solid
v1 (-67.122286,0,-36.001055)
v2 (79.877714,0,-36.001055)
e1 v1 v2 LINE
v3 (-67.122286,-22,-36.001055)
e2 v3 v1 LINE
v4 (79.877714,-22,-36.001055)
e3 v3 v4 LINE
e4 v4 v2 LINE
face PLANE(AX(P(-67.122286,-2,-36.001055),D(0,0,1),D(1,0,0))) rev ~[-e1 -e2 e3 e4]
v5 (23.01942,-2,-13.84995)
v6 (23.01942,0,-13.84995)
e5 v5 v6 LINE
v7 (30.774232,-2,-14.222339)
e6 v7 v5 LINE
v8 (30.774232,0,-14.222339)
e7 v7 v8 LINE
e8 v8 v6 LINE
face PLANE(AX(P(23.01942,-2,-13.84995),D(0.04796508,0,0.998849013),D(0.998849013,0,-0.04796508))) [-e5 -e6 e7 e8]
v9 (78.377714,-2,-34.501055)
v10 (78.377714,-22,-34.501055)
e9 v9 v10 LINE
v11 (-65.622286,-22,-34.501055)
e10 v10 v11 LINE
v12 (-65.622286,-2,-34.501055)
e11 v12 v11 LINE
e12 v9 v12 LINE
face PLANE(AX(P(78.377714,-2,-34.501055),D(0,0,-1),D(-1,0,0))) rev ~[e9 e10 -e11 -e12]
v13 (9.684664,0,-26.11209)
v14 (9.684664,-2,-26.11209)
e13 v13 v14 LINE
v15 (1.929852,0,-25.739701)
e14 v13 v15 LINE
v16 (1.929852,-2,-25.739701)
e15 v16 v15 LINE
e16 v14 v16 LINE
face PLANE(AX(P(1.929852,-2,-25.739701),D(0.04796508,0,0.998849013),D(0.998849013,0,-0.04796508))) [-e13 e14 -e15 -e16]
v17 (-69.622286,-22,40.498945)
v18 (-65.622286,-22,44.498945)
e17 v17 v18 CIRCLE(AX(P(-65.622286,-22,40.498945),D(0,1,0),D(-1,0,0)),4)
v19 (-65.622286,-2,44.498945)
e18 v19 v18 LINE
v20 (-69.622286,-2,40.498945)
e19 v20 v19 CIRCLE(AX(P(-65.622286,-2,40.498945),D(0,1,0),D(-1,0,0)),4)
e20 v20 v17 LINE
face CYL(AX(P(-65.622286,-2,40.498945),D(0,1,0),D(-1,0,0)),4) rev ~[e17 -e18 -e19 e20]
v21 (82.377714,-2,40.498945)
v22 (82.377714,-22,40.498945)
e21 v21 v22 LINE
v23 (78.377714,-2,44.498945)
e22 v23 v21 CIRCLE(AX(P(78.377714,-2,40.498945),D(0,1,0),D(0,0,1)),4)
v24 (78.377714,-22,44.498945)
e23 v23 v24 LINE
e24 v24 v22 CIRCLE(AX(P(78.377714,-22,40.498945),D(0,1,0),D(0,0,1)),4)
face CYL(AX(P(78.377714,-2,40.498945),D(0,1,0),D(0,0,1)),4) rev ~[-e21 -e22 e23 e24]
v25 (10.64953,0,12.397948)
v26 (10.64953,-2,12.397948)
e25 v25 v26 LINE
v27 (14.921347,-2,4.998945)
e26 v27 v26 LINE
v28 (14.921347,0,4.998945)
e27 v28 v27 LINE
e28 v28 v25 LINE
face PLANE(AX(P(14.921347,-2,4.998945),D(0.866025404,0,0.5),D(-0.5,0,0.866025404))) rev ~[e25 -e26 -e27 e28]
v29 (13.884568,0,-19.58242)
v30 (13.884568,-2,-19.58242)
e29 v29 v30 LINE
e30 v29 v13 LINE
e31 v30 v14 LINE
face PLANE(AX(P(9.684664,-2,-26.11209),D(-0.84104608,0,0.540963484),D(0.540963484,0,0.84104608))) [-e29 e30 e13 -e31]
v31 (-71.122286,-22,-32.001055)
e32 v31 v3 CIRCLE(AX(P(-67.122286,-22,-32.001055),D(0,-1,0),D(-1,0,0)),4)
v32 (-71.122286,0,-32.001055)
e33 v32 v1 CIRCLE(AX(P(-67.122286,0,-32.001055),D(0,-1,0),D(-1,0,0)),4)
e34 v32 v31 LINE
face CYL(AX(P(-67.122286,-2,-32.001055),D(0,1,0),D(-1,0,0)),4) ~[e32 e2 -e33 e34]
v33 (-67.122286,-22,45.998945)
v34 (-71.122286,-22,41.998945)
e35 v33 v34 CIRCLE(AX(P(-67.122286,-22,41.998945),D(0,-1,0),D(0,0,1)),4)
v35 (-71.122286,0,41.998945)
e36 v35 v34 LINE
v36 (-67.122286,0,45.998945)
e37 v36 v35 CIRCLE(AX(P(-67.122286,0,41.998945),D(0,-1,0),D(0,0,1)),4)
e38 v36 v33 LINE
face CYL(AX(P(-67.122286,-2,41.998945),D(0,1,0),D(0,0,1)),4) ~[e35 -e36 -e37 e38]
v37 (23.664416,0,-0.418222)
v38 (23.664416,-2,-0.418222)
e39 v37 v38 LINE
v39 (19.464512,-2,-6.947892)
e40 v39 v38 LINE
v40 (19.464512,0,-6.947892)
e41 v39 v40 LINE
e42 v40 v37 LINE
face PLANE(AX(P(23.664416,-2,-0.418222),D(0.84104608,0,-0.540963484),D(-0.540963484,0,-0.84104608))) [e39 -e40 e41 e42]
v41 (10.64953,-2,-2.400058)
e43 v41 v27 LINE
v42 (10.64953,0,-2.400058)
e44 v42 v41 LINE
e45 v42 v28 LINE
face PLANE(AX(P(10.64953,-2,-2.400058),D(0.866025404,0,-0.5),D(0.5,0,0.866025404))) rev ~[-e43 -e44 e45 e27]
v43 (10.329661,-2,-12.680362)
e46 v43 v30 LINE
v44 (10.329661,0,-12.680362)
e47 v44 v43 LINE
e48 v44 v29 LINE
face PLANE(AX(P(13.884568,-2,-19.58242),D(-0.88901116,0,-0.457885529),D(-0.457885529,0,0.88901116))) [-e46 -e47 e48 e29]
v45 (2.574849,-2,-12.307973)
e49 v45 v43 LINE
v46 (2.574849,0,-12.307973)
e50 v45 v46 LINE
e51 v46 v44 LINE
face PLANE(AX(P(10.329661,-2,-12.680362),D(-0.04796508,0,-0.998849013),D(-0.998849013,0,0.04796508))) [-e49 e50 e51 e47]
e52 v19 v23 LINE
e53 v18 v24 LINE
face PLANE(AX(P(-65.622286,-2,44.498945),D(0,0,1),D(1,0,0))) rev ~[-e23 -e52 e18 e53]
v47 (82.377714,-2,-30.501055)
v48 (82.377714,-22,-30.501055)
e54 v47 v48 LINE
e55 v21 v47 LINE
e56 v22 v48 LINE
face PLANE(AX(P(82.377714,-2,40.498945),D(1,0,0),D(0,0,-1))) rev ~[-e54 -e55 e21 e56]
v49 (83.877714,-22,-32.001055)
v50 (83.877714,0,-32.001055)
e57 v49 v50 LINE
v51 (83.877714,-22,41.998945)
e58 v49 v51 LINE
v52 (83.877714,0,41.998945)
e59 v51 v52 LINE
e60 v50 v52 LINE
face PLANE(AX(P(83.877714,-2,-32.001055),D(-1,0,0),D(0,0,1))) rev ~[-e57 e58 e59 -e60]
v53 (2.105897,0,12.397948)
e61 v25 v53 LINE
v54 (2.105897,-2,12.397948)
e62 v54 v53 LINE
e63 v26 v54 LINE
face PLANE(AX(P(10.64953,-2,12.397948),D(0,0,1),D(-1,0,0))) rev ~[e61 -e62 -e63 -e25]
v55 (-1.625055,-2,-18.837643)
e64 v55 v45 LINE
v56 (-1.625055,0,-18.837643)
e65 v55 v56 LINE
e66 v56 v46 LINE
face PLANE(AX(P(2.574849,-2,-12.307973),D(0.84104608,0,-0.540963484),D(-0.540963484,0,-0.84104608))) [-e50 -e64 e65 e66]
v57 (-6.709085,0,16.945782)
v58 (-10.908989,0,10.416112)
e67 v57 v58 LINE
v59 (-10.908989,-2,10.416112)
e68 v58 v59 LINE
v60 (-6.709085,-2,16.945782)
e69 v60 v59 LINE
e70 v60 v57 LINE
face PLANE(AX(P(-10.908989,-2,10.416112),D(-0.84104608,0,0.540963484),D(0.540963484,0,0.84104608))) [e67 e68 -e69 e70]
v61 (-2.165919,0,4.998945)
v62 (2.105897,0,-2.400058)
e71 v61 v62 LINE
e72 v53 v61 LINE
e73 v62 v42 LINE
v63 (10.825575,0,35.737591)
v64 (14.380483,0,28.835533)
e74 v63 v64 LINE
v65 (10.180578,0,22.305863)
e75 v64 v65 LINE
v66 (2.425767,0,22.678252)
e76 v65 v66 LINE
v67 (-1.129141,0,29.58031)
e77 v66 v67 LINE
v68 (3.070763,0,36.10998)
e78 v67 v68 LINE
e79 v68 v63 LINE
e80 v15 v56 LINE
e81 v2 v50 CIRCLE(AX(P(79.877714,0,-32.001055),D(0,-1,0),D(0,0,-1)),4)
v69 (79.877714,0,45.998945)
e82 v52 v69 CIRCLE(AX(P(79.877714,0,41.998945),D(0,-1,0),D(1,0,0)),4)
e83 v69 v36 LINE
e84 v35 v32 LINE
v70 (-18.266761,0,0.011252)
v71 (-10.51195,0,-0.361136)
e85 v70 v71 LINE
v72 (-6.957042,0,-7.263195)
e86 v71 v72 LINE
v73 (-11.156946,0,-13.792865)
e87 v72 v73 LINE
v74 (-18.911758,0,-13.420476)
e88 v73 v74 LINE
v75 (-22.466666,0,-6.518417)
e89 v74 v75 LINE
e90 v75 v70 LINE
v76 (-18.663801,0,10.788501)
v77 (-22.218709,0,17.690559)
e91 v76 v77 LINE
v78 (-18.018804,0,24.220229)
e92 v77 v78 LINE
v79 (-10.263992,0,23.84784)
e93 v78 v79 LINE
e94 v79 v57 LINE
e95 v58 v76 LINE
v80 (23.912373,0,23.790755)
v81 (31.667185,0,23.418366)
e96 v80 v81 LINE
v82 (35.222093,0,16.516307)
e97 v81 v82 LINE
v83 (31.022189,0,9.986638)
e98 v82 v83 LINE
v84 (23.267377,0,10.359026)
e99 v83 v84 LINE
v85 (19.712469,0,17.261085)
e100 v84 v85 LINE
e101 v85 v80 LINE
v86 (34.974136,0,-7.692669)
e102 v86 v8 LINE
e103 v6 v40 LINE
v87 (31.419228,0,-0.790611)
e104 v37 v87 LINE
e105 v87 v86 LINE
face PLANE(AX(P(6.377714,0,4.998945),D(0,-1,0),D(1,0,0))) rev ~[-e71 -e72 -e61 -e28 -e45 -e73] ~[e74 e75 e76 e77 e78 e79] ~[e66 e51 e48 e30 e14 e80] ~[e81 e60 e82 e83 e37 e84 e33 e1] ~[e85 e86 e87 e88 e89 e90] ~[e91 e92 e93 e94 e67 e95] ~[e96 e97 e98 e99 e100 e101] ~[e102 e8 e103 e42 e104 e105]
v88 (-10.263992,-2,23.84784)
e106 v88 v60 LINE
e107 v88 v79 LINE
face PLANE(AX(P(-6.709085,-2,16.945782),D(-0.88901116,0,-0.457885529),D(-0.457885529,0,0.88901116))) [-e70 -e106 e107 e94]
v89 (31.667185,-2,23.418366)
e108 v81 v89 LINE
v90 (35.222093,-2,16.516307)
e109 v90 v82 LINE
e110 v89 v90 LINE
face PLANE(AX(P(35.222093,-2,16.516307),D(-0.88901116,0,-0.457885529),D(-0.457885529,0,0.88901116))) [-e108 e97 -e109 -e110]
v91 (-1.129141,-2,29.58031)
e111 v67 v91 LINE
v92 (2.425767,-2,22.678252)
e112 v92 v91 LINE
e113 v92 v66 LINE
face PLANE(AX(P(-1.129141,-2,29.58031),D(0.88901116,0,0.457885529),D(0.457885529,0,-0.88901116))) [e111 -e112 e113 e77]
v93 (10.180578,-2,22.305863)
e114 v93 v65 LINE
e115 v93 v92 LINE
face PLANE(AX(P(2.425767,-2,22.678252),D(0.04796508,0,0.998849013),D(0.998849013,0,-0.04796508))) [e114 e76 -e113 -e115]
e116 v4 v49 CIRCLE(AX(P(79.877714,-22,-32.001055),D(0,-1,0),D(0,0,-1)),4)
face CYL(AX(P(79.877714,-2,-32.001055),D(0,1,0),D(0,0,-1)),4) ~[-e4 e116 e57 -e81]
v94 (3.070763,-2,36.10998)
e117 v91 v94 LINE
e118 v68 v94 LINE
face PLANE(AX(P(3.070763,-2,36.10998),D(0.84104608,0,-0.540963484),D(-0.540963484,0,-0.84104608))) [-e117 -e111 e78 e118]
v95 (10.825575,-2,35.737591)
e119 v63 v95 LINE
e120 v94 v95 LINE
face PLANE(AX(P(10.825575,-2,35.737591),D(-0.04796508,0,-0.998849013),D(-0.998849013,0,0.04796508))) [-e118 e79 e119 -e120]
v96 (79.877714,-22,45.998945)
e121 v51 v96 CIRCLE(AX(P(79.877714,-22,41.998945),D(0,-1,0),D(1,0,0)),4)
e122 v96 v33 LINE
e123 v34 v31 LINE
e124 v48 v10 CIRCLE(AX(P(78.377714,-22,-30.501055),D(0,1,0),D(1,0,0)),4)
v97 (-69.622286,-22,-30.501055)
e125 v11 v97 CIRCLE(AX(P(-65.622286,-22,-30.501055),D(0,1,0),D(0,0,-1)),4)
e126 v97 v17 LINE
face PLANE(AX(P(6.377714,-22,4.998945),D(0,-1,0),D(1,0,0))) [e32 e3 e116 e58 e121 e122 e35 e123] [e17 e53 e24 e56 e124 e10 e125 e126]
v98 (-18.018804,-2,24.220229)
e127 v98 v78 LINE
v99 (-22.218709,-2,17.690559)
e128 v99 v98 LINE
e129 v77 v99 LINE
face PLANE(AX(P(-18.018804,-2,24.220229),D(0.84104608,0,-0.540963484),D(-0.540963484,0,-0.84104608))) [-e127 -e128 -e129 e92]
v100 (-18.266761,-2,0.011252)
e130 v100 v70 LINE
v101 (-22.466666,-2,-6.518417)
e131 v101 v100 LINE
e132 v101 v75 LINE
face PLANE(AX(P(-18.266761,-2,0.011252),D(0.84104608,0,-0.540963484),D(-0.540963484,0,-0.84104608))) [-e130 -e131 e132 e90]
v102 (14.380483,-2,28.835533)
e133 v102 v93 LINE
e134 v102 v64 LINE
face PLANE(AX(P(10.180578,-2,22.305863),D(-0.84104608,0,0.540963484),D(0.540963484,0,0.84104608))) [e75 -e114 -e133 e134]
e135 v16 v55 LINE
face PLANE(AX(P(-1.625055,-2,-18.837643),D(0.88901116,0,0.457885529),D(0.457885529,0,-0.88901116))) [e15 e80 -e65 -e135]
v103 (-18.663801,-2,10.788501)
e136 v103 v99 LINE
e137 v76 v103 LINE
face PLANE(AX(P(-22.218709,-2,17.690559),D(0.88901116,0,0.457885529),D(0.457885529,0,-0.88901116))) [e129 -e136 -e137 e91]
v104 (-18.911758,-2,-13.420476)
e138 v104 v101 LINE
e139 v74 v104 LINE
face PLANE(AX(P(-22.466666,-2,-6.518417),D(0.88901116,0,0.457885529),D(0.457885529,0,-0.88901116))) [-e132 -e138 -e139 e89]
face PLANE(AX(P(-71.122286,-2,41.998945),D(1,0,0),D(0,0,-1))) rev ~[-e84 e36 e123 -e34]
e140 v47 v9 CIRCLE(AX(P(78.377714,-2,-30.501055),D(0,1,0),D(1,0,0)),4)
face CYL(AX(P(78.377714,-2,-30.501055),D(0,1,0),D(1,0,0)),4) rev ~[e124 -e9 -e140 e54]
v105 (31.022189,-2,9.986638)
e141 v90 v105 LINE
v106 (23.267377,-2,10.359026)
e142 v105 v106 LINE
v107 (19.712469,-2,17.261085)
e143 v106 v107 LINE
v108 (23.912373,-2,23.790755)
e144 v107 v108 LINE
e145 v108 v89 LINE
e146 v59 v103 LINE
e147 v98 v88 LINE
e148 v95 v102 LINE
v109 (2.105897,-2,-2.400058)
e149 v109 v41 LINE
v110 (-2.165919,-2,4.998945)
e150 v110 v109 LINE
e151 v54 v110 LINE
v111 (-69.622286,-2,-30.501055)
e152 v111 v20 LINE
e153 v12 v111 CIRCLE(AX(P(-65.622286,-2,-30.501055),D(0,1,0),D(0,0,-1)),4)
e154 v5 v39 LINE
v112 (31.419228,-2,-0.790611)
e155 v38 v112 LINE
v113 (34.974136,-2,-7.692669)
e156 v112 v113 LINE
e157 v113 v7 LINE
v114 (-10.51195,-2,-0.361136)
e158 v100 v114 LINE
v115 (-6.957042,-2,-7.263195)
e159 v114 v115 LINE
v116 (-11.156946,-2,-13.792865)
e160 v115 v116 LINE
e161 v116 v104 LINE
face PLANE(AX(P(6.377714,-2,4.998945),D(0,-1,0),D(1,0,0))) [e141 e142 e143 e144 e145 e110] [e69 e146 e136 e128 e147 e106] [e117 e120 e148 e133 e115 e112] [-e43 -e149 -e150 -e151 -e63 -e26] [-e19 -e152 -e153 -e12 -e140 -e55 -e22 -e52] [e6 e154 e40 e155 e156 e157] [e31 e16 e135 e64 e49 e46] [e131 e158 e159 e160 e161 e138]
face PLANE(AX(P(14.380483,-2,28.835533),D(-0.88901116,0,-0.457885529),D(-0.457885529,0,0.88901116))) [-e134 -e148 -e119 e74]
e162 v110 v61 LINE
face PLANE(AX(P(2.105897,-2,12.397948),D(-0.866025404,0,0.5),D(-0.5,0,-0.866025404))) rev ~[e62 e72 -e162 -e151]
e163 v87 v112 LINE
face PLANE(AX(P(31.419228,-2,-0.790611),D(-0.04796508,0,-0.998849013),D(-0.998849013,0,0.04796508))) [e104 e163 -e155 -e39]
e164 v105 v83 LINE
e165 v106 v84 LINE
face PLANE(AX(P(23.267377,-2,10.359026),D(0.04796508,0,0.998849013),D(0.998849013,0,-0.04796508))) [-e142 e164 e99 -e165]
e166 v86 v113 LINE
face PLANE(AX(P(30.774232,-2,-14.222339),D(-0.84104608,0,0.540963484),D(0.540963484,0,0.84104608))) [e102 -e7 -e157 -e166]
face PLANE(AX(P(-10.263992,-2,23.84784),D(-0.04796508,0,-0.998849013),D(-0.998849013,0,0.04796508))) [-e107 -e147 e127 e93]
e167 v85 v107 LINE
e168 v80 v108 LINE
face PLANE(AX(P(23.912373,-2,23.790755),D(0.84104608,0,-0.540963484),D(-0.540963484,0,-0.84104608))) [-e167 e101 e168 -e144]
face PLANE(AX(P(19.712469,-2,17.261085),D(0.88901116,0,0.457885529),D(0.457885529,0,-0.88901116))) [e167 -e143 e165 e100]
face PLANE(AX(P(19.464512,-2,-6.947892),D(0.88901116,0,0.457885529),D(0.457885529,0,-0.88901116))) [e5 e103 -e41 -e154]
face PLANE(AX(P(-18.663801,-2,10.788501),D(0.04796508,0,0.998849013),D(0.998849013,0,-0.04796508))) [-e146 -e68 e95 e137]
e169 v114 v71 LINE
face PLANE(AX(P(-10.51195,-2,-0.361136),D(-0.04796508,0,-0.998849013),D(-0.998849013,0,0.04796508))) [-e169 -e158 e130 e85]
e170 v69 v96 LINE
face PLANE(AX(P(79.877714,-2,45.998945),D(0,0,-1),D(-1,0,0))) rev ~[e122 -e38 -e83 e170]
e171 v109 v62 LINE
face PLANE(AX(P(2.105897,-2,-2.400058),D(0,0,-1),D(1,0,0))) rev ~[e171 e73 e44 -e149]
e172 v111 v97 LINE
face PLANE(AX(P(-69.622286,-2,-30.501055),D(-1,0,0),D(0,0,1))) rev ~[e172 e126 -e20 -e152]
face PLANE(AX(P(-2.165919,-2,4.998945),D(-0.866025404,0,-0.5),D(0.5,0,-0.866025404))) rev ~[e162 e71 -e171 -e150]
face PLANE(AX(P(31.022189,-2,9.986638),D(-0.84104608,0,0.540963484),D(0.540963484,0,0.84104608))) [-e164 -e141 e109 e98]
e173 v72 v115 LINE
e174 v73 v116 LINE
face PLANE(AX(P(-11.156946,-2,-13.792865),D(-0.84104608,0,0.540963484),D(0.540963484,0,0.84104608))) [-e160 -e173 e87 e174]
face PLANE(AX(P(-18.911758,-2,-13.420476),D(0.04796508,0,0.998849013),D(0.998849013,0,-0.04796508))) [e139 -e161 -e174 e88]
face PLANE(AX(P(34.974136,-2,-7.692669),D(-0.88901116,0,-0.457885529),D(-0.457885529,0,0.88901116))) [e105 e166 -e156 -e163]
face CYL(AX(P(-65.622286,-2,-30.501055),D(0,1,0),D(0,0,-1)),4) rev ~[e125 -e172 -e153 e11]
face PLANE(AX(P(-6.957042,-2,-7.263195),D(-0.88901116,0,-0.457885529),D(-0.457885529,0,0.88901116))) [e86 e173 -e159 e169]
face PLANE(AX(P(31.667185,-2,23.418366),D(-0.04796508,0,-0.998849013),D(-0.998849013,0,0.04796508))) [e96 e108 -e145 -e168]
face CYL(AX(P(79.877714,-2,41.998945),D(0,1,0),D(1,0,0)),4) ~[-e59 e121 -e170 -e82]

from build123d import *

# Parameters (mm, degrees)
F1_DEPTH = 2
F3_DEPTH = 20
F5_DEPTH = 12.5


# Not quite as in the source:
# - a feature names something its author has since deleted; it is built from what else it names


with BuildPart() as f1:
    # F0 (on Front) → F1 (new body)
    with BuildSketch(Plane.XZ):
        with BuildLine():
            Line((79.8777135909, 45.9989449601), (-67.1222864091, 45.9989449601))
            ThreePointArc((-67.1222864091, 45.9989449601), (-69.9507135339, 44.8273720848), (-71.1222864091, 41.9989449601))
            Line((-71.1222864091, 41.9989449601), (-71.1222864091, -32.0010550399))
            ThreePointArc((-71.1222864091, -32.0010550399), (-69.9507135339, -34.8294821647), (-67.1222864091, -36.0010550399))
            Line((-67.1222864091, -36.0010550399), (79.8777135909, -36.0010550399))
            ThreePointArc((79.8777135909, -36.0010550399), (82.7061407156, -34.8294821647), (83.8777135909, -32.0010550399))
            Line((83.8777135909, -32.0010550399), (83.8777135909, 41.9989449601))
            ThreePointArc((83.8777135909, 41.9989449601), (82.7061407156, 44.8273720848), (79.8777135909, 45.9989449601))
        make_face()
    extrude(amount=F1_DEPTH)

    # F2 (on face) → F3 (join)
    with BuildSketch(Plane.XZ.offset(2)):
        with BuildLine():
            ThreePointArc((83.8777135909, 41.9989449601), (82.7061407156, 44.8273720848), (79.8777135909, 45.9989449601))
            Line((79.8777135909, 45.9989449601), (-67.1222864091, 45.9989449601))
            ThreePointArc((-67.1222864091, 45.9989449601), (-69.9507135339, 44.8273720848), (-71.1222864091, 41.9989449601))
            Line((-71.1222864091, 41.9989449601), (-71.1222864091, -32.0010550399))
            ThreePointArc((-71.1222864091, -32.0010550399), (-69.9507135339, -34.8294821647), (-67.1222864091, -36.0010550399))
            Line((-67.1222864091, -36.0010550399), (79.8777135909, -36.0010550399))
            ThreePointArc((79.8777135909, -36.0010550399), (82.7061407156, -34.8294821647), (83.8777135909, -32.0010550399))
            Line((83.8777135909, -32.0010550399), (83.8777135909, 41.9989449601))
        make_face()
        with BuildLine():
            ThreePointArc((-69.6222864091, 40.4989449601), (-68.4507135339, 43.3273720848), (-65.6222864091, 44.4989449601))
            Line((-65.6222864091, 44.4989449601), (78.3777135909, 44.4989449601))
            ThreePointArc((78.3777135909, 44.4989449601), (81.2061407156, 43.3273720848), (82.3777135909, 40.4989449601))
            Line((82.3777135909, 40.4989449601), (82.3777135909, -30.5010550399))
            ThreePointArc((82.3777135909, -30.5010550399), (81.2061407156, -33.3294821647), (78.3777135909, -34.5010550399))
            Line((78.3777135909, -34.5010550399), (-65.6222864091, -34.5010550399))
            ThreePointArc((-65.6222864091, -34.5010550399), (-68.4507135339, -33.3294821647), (-69.6222864091, -30.5010550399))
            Line((-69.6222864091, -30.5010550399), (-69.6222864091, 40.4989449601))
        make_face(mode=Mode.SUBTRACT)
    extrude(amount=F3_DEPTH)

    # F4 (on face) → F5 (cut, symmetric)
    with BuildSketch(Plane.XZ.offset(2)):
        Polygon((14.3804825891, 28.8355327559), (10.8255747657, 35.7375912952), (3.0707628205, 36.1099800817), (-1.1291413013, 29.5803103289), (2.4257665221, 22.6782517895), (10.1805784673, 22.305863003), align=None)
        Polygon((35.2220927825, 16.5163073577), (31.6671849591, 23.4183658971), (23.9123730139, 23.7907546836), (19.7124688921, 17.2610849307), (23.2673767155, 10.3590263914), (31.0221886607, 9.9866376049), align=None)
        Polygon((30.7742316076, -14.2223389774), (34.9741357295, -7.6926692246), (31.419227906, -0.7906106852), (23.6644159608, -0.4182218987), (19.464511839, -6.9478916516), (23.0194196624, -13.8499501909), align=None)
        Polygon((1.929852416, -25.7397013751), (9.6846643612, -26.1120901616), (13.884568483, -19.5824204088), (10.3296606596, -12.6803618694), (2.5748487144, -12.3079730829), (-1.6250554074, -18.8376428357), align=None)
        Polygon((-22.4666656008, -6.5184174376), (-18.9117577774, -13.420475977), (-11.1569458322, -13.7928647635), (-6.9570417103, -7.2631950106), (-10.5119495338, -0.3611364712), (-18.266761479, 0.0112523153), align=None)
        Polygon((-18.0188044259, 24.2202288976), (-22.2187085477, 17.6905591447), (-18.6638007243, 10.7885006053), (-10.9089887791, 10.4161118188), (-6.7090846573, 16.9457815717), (-10.2639924807, 23.8478401111), align=None)
        Polygon((2.1058970544, -2.4000583217), (10.6495301273, -2.4000583217), (14.9213466637, 4.9989449601), (10.6495301273, 12.3979482418), (2.1058970544, 12.3979482418), (-2.165919482, 4.9989449601), align=None)
    extrude(amount=F5_DEPTH, both=True, mode=Mode.SUBTRACT)


solid = f1.part
